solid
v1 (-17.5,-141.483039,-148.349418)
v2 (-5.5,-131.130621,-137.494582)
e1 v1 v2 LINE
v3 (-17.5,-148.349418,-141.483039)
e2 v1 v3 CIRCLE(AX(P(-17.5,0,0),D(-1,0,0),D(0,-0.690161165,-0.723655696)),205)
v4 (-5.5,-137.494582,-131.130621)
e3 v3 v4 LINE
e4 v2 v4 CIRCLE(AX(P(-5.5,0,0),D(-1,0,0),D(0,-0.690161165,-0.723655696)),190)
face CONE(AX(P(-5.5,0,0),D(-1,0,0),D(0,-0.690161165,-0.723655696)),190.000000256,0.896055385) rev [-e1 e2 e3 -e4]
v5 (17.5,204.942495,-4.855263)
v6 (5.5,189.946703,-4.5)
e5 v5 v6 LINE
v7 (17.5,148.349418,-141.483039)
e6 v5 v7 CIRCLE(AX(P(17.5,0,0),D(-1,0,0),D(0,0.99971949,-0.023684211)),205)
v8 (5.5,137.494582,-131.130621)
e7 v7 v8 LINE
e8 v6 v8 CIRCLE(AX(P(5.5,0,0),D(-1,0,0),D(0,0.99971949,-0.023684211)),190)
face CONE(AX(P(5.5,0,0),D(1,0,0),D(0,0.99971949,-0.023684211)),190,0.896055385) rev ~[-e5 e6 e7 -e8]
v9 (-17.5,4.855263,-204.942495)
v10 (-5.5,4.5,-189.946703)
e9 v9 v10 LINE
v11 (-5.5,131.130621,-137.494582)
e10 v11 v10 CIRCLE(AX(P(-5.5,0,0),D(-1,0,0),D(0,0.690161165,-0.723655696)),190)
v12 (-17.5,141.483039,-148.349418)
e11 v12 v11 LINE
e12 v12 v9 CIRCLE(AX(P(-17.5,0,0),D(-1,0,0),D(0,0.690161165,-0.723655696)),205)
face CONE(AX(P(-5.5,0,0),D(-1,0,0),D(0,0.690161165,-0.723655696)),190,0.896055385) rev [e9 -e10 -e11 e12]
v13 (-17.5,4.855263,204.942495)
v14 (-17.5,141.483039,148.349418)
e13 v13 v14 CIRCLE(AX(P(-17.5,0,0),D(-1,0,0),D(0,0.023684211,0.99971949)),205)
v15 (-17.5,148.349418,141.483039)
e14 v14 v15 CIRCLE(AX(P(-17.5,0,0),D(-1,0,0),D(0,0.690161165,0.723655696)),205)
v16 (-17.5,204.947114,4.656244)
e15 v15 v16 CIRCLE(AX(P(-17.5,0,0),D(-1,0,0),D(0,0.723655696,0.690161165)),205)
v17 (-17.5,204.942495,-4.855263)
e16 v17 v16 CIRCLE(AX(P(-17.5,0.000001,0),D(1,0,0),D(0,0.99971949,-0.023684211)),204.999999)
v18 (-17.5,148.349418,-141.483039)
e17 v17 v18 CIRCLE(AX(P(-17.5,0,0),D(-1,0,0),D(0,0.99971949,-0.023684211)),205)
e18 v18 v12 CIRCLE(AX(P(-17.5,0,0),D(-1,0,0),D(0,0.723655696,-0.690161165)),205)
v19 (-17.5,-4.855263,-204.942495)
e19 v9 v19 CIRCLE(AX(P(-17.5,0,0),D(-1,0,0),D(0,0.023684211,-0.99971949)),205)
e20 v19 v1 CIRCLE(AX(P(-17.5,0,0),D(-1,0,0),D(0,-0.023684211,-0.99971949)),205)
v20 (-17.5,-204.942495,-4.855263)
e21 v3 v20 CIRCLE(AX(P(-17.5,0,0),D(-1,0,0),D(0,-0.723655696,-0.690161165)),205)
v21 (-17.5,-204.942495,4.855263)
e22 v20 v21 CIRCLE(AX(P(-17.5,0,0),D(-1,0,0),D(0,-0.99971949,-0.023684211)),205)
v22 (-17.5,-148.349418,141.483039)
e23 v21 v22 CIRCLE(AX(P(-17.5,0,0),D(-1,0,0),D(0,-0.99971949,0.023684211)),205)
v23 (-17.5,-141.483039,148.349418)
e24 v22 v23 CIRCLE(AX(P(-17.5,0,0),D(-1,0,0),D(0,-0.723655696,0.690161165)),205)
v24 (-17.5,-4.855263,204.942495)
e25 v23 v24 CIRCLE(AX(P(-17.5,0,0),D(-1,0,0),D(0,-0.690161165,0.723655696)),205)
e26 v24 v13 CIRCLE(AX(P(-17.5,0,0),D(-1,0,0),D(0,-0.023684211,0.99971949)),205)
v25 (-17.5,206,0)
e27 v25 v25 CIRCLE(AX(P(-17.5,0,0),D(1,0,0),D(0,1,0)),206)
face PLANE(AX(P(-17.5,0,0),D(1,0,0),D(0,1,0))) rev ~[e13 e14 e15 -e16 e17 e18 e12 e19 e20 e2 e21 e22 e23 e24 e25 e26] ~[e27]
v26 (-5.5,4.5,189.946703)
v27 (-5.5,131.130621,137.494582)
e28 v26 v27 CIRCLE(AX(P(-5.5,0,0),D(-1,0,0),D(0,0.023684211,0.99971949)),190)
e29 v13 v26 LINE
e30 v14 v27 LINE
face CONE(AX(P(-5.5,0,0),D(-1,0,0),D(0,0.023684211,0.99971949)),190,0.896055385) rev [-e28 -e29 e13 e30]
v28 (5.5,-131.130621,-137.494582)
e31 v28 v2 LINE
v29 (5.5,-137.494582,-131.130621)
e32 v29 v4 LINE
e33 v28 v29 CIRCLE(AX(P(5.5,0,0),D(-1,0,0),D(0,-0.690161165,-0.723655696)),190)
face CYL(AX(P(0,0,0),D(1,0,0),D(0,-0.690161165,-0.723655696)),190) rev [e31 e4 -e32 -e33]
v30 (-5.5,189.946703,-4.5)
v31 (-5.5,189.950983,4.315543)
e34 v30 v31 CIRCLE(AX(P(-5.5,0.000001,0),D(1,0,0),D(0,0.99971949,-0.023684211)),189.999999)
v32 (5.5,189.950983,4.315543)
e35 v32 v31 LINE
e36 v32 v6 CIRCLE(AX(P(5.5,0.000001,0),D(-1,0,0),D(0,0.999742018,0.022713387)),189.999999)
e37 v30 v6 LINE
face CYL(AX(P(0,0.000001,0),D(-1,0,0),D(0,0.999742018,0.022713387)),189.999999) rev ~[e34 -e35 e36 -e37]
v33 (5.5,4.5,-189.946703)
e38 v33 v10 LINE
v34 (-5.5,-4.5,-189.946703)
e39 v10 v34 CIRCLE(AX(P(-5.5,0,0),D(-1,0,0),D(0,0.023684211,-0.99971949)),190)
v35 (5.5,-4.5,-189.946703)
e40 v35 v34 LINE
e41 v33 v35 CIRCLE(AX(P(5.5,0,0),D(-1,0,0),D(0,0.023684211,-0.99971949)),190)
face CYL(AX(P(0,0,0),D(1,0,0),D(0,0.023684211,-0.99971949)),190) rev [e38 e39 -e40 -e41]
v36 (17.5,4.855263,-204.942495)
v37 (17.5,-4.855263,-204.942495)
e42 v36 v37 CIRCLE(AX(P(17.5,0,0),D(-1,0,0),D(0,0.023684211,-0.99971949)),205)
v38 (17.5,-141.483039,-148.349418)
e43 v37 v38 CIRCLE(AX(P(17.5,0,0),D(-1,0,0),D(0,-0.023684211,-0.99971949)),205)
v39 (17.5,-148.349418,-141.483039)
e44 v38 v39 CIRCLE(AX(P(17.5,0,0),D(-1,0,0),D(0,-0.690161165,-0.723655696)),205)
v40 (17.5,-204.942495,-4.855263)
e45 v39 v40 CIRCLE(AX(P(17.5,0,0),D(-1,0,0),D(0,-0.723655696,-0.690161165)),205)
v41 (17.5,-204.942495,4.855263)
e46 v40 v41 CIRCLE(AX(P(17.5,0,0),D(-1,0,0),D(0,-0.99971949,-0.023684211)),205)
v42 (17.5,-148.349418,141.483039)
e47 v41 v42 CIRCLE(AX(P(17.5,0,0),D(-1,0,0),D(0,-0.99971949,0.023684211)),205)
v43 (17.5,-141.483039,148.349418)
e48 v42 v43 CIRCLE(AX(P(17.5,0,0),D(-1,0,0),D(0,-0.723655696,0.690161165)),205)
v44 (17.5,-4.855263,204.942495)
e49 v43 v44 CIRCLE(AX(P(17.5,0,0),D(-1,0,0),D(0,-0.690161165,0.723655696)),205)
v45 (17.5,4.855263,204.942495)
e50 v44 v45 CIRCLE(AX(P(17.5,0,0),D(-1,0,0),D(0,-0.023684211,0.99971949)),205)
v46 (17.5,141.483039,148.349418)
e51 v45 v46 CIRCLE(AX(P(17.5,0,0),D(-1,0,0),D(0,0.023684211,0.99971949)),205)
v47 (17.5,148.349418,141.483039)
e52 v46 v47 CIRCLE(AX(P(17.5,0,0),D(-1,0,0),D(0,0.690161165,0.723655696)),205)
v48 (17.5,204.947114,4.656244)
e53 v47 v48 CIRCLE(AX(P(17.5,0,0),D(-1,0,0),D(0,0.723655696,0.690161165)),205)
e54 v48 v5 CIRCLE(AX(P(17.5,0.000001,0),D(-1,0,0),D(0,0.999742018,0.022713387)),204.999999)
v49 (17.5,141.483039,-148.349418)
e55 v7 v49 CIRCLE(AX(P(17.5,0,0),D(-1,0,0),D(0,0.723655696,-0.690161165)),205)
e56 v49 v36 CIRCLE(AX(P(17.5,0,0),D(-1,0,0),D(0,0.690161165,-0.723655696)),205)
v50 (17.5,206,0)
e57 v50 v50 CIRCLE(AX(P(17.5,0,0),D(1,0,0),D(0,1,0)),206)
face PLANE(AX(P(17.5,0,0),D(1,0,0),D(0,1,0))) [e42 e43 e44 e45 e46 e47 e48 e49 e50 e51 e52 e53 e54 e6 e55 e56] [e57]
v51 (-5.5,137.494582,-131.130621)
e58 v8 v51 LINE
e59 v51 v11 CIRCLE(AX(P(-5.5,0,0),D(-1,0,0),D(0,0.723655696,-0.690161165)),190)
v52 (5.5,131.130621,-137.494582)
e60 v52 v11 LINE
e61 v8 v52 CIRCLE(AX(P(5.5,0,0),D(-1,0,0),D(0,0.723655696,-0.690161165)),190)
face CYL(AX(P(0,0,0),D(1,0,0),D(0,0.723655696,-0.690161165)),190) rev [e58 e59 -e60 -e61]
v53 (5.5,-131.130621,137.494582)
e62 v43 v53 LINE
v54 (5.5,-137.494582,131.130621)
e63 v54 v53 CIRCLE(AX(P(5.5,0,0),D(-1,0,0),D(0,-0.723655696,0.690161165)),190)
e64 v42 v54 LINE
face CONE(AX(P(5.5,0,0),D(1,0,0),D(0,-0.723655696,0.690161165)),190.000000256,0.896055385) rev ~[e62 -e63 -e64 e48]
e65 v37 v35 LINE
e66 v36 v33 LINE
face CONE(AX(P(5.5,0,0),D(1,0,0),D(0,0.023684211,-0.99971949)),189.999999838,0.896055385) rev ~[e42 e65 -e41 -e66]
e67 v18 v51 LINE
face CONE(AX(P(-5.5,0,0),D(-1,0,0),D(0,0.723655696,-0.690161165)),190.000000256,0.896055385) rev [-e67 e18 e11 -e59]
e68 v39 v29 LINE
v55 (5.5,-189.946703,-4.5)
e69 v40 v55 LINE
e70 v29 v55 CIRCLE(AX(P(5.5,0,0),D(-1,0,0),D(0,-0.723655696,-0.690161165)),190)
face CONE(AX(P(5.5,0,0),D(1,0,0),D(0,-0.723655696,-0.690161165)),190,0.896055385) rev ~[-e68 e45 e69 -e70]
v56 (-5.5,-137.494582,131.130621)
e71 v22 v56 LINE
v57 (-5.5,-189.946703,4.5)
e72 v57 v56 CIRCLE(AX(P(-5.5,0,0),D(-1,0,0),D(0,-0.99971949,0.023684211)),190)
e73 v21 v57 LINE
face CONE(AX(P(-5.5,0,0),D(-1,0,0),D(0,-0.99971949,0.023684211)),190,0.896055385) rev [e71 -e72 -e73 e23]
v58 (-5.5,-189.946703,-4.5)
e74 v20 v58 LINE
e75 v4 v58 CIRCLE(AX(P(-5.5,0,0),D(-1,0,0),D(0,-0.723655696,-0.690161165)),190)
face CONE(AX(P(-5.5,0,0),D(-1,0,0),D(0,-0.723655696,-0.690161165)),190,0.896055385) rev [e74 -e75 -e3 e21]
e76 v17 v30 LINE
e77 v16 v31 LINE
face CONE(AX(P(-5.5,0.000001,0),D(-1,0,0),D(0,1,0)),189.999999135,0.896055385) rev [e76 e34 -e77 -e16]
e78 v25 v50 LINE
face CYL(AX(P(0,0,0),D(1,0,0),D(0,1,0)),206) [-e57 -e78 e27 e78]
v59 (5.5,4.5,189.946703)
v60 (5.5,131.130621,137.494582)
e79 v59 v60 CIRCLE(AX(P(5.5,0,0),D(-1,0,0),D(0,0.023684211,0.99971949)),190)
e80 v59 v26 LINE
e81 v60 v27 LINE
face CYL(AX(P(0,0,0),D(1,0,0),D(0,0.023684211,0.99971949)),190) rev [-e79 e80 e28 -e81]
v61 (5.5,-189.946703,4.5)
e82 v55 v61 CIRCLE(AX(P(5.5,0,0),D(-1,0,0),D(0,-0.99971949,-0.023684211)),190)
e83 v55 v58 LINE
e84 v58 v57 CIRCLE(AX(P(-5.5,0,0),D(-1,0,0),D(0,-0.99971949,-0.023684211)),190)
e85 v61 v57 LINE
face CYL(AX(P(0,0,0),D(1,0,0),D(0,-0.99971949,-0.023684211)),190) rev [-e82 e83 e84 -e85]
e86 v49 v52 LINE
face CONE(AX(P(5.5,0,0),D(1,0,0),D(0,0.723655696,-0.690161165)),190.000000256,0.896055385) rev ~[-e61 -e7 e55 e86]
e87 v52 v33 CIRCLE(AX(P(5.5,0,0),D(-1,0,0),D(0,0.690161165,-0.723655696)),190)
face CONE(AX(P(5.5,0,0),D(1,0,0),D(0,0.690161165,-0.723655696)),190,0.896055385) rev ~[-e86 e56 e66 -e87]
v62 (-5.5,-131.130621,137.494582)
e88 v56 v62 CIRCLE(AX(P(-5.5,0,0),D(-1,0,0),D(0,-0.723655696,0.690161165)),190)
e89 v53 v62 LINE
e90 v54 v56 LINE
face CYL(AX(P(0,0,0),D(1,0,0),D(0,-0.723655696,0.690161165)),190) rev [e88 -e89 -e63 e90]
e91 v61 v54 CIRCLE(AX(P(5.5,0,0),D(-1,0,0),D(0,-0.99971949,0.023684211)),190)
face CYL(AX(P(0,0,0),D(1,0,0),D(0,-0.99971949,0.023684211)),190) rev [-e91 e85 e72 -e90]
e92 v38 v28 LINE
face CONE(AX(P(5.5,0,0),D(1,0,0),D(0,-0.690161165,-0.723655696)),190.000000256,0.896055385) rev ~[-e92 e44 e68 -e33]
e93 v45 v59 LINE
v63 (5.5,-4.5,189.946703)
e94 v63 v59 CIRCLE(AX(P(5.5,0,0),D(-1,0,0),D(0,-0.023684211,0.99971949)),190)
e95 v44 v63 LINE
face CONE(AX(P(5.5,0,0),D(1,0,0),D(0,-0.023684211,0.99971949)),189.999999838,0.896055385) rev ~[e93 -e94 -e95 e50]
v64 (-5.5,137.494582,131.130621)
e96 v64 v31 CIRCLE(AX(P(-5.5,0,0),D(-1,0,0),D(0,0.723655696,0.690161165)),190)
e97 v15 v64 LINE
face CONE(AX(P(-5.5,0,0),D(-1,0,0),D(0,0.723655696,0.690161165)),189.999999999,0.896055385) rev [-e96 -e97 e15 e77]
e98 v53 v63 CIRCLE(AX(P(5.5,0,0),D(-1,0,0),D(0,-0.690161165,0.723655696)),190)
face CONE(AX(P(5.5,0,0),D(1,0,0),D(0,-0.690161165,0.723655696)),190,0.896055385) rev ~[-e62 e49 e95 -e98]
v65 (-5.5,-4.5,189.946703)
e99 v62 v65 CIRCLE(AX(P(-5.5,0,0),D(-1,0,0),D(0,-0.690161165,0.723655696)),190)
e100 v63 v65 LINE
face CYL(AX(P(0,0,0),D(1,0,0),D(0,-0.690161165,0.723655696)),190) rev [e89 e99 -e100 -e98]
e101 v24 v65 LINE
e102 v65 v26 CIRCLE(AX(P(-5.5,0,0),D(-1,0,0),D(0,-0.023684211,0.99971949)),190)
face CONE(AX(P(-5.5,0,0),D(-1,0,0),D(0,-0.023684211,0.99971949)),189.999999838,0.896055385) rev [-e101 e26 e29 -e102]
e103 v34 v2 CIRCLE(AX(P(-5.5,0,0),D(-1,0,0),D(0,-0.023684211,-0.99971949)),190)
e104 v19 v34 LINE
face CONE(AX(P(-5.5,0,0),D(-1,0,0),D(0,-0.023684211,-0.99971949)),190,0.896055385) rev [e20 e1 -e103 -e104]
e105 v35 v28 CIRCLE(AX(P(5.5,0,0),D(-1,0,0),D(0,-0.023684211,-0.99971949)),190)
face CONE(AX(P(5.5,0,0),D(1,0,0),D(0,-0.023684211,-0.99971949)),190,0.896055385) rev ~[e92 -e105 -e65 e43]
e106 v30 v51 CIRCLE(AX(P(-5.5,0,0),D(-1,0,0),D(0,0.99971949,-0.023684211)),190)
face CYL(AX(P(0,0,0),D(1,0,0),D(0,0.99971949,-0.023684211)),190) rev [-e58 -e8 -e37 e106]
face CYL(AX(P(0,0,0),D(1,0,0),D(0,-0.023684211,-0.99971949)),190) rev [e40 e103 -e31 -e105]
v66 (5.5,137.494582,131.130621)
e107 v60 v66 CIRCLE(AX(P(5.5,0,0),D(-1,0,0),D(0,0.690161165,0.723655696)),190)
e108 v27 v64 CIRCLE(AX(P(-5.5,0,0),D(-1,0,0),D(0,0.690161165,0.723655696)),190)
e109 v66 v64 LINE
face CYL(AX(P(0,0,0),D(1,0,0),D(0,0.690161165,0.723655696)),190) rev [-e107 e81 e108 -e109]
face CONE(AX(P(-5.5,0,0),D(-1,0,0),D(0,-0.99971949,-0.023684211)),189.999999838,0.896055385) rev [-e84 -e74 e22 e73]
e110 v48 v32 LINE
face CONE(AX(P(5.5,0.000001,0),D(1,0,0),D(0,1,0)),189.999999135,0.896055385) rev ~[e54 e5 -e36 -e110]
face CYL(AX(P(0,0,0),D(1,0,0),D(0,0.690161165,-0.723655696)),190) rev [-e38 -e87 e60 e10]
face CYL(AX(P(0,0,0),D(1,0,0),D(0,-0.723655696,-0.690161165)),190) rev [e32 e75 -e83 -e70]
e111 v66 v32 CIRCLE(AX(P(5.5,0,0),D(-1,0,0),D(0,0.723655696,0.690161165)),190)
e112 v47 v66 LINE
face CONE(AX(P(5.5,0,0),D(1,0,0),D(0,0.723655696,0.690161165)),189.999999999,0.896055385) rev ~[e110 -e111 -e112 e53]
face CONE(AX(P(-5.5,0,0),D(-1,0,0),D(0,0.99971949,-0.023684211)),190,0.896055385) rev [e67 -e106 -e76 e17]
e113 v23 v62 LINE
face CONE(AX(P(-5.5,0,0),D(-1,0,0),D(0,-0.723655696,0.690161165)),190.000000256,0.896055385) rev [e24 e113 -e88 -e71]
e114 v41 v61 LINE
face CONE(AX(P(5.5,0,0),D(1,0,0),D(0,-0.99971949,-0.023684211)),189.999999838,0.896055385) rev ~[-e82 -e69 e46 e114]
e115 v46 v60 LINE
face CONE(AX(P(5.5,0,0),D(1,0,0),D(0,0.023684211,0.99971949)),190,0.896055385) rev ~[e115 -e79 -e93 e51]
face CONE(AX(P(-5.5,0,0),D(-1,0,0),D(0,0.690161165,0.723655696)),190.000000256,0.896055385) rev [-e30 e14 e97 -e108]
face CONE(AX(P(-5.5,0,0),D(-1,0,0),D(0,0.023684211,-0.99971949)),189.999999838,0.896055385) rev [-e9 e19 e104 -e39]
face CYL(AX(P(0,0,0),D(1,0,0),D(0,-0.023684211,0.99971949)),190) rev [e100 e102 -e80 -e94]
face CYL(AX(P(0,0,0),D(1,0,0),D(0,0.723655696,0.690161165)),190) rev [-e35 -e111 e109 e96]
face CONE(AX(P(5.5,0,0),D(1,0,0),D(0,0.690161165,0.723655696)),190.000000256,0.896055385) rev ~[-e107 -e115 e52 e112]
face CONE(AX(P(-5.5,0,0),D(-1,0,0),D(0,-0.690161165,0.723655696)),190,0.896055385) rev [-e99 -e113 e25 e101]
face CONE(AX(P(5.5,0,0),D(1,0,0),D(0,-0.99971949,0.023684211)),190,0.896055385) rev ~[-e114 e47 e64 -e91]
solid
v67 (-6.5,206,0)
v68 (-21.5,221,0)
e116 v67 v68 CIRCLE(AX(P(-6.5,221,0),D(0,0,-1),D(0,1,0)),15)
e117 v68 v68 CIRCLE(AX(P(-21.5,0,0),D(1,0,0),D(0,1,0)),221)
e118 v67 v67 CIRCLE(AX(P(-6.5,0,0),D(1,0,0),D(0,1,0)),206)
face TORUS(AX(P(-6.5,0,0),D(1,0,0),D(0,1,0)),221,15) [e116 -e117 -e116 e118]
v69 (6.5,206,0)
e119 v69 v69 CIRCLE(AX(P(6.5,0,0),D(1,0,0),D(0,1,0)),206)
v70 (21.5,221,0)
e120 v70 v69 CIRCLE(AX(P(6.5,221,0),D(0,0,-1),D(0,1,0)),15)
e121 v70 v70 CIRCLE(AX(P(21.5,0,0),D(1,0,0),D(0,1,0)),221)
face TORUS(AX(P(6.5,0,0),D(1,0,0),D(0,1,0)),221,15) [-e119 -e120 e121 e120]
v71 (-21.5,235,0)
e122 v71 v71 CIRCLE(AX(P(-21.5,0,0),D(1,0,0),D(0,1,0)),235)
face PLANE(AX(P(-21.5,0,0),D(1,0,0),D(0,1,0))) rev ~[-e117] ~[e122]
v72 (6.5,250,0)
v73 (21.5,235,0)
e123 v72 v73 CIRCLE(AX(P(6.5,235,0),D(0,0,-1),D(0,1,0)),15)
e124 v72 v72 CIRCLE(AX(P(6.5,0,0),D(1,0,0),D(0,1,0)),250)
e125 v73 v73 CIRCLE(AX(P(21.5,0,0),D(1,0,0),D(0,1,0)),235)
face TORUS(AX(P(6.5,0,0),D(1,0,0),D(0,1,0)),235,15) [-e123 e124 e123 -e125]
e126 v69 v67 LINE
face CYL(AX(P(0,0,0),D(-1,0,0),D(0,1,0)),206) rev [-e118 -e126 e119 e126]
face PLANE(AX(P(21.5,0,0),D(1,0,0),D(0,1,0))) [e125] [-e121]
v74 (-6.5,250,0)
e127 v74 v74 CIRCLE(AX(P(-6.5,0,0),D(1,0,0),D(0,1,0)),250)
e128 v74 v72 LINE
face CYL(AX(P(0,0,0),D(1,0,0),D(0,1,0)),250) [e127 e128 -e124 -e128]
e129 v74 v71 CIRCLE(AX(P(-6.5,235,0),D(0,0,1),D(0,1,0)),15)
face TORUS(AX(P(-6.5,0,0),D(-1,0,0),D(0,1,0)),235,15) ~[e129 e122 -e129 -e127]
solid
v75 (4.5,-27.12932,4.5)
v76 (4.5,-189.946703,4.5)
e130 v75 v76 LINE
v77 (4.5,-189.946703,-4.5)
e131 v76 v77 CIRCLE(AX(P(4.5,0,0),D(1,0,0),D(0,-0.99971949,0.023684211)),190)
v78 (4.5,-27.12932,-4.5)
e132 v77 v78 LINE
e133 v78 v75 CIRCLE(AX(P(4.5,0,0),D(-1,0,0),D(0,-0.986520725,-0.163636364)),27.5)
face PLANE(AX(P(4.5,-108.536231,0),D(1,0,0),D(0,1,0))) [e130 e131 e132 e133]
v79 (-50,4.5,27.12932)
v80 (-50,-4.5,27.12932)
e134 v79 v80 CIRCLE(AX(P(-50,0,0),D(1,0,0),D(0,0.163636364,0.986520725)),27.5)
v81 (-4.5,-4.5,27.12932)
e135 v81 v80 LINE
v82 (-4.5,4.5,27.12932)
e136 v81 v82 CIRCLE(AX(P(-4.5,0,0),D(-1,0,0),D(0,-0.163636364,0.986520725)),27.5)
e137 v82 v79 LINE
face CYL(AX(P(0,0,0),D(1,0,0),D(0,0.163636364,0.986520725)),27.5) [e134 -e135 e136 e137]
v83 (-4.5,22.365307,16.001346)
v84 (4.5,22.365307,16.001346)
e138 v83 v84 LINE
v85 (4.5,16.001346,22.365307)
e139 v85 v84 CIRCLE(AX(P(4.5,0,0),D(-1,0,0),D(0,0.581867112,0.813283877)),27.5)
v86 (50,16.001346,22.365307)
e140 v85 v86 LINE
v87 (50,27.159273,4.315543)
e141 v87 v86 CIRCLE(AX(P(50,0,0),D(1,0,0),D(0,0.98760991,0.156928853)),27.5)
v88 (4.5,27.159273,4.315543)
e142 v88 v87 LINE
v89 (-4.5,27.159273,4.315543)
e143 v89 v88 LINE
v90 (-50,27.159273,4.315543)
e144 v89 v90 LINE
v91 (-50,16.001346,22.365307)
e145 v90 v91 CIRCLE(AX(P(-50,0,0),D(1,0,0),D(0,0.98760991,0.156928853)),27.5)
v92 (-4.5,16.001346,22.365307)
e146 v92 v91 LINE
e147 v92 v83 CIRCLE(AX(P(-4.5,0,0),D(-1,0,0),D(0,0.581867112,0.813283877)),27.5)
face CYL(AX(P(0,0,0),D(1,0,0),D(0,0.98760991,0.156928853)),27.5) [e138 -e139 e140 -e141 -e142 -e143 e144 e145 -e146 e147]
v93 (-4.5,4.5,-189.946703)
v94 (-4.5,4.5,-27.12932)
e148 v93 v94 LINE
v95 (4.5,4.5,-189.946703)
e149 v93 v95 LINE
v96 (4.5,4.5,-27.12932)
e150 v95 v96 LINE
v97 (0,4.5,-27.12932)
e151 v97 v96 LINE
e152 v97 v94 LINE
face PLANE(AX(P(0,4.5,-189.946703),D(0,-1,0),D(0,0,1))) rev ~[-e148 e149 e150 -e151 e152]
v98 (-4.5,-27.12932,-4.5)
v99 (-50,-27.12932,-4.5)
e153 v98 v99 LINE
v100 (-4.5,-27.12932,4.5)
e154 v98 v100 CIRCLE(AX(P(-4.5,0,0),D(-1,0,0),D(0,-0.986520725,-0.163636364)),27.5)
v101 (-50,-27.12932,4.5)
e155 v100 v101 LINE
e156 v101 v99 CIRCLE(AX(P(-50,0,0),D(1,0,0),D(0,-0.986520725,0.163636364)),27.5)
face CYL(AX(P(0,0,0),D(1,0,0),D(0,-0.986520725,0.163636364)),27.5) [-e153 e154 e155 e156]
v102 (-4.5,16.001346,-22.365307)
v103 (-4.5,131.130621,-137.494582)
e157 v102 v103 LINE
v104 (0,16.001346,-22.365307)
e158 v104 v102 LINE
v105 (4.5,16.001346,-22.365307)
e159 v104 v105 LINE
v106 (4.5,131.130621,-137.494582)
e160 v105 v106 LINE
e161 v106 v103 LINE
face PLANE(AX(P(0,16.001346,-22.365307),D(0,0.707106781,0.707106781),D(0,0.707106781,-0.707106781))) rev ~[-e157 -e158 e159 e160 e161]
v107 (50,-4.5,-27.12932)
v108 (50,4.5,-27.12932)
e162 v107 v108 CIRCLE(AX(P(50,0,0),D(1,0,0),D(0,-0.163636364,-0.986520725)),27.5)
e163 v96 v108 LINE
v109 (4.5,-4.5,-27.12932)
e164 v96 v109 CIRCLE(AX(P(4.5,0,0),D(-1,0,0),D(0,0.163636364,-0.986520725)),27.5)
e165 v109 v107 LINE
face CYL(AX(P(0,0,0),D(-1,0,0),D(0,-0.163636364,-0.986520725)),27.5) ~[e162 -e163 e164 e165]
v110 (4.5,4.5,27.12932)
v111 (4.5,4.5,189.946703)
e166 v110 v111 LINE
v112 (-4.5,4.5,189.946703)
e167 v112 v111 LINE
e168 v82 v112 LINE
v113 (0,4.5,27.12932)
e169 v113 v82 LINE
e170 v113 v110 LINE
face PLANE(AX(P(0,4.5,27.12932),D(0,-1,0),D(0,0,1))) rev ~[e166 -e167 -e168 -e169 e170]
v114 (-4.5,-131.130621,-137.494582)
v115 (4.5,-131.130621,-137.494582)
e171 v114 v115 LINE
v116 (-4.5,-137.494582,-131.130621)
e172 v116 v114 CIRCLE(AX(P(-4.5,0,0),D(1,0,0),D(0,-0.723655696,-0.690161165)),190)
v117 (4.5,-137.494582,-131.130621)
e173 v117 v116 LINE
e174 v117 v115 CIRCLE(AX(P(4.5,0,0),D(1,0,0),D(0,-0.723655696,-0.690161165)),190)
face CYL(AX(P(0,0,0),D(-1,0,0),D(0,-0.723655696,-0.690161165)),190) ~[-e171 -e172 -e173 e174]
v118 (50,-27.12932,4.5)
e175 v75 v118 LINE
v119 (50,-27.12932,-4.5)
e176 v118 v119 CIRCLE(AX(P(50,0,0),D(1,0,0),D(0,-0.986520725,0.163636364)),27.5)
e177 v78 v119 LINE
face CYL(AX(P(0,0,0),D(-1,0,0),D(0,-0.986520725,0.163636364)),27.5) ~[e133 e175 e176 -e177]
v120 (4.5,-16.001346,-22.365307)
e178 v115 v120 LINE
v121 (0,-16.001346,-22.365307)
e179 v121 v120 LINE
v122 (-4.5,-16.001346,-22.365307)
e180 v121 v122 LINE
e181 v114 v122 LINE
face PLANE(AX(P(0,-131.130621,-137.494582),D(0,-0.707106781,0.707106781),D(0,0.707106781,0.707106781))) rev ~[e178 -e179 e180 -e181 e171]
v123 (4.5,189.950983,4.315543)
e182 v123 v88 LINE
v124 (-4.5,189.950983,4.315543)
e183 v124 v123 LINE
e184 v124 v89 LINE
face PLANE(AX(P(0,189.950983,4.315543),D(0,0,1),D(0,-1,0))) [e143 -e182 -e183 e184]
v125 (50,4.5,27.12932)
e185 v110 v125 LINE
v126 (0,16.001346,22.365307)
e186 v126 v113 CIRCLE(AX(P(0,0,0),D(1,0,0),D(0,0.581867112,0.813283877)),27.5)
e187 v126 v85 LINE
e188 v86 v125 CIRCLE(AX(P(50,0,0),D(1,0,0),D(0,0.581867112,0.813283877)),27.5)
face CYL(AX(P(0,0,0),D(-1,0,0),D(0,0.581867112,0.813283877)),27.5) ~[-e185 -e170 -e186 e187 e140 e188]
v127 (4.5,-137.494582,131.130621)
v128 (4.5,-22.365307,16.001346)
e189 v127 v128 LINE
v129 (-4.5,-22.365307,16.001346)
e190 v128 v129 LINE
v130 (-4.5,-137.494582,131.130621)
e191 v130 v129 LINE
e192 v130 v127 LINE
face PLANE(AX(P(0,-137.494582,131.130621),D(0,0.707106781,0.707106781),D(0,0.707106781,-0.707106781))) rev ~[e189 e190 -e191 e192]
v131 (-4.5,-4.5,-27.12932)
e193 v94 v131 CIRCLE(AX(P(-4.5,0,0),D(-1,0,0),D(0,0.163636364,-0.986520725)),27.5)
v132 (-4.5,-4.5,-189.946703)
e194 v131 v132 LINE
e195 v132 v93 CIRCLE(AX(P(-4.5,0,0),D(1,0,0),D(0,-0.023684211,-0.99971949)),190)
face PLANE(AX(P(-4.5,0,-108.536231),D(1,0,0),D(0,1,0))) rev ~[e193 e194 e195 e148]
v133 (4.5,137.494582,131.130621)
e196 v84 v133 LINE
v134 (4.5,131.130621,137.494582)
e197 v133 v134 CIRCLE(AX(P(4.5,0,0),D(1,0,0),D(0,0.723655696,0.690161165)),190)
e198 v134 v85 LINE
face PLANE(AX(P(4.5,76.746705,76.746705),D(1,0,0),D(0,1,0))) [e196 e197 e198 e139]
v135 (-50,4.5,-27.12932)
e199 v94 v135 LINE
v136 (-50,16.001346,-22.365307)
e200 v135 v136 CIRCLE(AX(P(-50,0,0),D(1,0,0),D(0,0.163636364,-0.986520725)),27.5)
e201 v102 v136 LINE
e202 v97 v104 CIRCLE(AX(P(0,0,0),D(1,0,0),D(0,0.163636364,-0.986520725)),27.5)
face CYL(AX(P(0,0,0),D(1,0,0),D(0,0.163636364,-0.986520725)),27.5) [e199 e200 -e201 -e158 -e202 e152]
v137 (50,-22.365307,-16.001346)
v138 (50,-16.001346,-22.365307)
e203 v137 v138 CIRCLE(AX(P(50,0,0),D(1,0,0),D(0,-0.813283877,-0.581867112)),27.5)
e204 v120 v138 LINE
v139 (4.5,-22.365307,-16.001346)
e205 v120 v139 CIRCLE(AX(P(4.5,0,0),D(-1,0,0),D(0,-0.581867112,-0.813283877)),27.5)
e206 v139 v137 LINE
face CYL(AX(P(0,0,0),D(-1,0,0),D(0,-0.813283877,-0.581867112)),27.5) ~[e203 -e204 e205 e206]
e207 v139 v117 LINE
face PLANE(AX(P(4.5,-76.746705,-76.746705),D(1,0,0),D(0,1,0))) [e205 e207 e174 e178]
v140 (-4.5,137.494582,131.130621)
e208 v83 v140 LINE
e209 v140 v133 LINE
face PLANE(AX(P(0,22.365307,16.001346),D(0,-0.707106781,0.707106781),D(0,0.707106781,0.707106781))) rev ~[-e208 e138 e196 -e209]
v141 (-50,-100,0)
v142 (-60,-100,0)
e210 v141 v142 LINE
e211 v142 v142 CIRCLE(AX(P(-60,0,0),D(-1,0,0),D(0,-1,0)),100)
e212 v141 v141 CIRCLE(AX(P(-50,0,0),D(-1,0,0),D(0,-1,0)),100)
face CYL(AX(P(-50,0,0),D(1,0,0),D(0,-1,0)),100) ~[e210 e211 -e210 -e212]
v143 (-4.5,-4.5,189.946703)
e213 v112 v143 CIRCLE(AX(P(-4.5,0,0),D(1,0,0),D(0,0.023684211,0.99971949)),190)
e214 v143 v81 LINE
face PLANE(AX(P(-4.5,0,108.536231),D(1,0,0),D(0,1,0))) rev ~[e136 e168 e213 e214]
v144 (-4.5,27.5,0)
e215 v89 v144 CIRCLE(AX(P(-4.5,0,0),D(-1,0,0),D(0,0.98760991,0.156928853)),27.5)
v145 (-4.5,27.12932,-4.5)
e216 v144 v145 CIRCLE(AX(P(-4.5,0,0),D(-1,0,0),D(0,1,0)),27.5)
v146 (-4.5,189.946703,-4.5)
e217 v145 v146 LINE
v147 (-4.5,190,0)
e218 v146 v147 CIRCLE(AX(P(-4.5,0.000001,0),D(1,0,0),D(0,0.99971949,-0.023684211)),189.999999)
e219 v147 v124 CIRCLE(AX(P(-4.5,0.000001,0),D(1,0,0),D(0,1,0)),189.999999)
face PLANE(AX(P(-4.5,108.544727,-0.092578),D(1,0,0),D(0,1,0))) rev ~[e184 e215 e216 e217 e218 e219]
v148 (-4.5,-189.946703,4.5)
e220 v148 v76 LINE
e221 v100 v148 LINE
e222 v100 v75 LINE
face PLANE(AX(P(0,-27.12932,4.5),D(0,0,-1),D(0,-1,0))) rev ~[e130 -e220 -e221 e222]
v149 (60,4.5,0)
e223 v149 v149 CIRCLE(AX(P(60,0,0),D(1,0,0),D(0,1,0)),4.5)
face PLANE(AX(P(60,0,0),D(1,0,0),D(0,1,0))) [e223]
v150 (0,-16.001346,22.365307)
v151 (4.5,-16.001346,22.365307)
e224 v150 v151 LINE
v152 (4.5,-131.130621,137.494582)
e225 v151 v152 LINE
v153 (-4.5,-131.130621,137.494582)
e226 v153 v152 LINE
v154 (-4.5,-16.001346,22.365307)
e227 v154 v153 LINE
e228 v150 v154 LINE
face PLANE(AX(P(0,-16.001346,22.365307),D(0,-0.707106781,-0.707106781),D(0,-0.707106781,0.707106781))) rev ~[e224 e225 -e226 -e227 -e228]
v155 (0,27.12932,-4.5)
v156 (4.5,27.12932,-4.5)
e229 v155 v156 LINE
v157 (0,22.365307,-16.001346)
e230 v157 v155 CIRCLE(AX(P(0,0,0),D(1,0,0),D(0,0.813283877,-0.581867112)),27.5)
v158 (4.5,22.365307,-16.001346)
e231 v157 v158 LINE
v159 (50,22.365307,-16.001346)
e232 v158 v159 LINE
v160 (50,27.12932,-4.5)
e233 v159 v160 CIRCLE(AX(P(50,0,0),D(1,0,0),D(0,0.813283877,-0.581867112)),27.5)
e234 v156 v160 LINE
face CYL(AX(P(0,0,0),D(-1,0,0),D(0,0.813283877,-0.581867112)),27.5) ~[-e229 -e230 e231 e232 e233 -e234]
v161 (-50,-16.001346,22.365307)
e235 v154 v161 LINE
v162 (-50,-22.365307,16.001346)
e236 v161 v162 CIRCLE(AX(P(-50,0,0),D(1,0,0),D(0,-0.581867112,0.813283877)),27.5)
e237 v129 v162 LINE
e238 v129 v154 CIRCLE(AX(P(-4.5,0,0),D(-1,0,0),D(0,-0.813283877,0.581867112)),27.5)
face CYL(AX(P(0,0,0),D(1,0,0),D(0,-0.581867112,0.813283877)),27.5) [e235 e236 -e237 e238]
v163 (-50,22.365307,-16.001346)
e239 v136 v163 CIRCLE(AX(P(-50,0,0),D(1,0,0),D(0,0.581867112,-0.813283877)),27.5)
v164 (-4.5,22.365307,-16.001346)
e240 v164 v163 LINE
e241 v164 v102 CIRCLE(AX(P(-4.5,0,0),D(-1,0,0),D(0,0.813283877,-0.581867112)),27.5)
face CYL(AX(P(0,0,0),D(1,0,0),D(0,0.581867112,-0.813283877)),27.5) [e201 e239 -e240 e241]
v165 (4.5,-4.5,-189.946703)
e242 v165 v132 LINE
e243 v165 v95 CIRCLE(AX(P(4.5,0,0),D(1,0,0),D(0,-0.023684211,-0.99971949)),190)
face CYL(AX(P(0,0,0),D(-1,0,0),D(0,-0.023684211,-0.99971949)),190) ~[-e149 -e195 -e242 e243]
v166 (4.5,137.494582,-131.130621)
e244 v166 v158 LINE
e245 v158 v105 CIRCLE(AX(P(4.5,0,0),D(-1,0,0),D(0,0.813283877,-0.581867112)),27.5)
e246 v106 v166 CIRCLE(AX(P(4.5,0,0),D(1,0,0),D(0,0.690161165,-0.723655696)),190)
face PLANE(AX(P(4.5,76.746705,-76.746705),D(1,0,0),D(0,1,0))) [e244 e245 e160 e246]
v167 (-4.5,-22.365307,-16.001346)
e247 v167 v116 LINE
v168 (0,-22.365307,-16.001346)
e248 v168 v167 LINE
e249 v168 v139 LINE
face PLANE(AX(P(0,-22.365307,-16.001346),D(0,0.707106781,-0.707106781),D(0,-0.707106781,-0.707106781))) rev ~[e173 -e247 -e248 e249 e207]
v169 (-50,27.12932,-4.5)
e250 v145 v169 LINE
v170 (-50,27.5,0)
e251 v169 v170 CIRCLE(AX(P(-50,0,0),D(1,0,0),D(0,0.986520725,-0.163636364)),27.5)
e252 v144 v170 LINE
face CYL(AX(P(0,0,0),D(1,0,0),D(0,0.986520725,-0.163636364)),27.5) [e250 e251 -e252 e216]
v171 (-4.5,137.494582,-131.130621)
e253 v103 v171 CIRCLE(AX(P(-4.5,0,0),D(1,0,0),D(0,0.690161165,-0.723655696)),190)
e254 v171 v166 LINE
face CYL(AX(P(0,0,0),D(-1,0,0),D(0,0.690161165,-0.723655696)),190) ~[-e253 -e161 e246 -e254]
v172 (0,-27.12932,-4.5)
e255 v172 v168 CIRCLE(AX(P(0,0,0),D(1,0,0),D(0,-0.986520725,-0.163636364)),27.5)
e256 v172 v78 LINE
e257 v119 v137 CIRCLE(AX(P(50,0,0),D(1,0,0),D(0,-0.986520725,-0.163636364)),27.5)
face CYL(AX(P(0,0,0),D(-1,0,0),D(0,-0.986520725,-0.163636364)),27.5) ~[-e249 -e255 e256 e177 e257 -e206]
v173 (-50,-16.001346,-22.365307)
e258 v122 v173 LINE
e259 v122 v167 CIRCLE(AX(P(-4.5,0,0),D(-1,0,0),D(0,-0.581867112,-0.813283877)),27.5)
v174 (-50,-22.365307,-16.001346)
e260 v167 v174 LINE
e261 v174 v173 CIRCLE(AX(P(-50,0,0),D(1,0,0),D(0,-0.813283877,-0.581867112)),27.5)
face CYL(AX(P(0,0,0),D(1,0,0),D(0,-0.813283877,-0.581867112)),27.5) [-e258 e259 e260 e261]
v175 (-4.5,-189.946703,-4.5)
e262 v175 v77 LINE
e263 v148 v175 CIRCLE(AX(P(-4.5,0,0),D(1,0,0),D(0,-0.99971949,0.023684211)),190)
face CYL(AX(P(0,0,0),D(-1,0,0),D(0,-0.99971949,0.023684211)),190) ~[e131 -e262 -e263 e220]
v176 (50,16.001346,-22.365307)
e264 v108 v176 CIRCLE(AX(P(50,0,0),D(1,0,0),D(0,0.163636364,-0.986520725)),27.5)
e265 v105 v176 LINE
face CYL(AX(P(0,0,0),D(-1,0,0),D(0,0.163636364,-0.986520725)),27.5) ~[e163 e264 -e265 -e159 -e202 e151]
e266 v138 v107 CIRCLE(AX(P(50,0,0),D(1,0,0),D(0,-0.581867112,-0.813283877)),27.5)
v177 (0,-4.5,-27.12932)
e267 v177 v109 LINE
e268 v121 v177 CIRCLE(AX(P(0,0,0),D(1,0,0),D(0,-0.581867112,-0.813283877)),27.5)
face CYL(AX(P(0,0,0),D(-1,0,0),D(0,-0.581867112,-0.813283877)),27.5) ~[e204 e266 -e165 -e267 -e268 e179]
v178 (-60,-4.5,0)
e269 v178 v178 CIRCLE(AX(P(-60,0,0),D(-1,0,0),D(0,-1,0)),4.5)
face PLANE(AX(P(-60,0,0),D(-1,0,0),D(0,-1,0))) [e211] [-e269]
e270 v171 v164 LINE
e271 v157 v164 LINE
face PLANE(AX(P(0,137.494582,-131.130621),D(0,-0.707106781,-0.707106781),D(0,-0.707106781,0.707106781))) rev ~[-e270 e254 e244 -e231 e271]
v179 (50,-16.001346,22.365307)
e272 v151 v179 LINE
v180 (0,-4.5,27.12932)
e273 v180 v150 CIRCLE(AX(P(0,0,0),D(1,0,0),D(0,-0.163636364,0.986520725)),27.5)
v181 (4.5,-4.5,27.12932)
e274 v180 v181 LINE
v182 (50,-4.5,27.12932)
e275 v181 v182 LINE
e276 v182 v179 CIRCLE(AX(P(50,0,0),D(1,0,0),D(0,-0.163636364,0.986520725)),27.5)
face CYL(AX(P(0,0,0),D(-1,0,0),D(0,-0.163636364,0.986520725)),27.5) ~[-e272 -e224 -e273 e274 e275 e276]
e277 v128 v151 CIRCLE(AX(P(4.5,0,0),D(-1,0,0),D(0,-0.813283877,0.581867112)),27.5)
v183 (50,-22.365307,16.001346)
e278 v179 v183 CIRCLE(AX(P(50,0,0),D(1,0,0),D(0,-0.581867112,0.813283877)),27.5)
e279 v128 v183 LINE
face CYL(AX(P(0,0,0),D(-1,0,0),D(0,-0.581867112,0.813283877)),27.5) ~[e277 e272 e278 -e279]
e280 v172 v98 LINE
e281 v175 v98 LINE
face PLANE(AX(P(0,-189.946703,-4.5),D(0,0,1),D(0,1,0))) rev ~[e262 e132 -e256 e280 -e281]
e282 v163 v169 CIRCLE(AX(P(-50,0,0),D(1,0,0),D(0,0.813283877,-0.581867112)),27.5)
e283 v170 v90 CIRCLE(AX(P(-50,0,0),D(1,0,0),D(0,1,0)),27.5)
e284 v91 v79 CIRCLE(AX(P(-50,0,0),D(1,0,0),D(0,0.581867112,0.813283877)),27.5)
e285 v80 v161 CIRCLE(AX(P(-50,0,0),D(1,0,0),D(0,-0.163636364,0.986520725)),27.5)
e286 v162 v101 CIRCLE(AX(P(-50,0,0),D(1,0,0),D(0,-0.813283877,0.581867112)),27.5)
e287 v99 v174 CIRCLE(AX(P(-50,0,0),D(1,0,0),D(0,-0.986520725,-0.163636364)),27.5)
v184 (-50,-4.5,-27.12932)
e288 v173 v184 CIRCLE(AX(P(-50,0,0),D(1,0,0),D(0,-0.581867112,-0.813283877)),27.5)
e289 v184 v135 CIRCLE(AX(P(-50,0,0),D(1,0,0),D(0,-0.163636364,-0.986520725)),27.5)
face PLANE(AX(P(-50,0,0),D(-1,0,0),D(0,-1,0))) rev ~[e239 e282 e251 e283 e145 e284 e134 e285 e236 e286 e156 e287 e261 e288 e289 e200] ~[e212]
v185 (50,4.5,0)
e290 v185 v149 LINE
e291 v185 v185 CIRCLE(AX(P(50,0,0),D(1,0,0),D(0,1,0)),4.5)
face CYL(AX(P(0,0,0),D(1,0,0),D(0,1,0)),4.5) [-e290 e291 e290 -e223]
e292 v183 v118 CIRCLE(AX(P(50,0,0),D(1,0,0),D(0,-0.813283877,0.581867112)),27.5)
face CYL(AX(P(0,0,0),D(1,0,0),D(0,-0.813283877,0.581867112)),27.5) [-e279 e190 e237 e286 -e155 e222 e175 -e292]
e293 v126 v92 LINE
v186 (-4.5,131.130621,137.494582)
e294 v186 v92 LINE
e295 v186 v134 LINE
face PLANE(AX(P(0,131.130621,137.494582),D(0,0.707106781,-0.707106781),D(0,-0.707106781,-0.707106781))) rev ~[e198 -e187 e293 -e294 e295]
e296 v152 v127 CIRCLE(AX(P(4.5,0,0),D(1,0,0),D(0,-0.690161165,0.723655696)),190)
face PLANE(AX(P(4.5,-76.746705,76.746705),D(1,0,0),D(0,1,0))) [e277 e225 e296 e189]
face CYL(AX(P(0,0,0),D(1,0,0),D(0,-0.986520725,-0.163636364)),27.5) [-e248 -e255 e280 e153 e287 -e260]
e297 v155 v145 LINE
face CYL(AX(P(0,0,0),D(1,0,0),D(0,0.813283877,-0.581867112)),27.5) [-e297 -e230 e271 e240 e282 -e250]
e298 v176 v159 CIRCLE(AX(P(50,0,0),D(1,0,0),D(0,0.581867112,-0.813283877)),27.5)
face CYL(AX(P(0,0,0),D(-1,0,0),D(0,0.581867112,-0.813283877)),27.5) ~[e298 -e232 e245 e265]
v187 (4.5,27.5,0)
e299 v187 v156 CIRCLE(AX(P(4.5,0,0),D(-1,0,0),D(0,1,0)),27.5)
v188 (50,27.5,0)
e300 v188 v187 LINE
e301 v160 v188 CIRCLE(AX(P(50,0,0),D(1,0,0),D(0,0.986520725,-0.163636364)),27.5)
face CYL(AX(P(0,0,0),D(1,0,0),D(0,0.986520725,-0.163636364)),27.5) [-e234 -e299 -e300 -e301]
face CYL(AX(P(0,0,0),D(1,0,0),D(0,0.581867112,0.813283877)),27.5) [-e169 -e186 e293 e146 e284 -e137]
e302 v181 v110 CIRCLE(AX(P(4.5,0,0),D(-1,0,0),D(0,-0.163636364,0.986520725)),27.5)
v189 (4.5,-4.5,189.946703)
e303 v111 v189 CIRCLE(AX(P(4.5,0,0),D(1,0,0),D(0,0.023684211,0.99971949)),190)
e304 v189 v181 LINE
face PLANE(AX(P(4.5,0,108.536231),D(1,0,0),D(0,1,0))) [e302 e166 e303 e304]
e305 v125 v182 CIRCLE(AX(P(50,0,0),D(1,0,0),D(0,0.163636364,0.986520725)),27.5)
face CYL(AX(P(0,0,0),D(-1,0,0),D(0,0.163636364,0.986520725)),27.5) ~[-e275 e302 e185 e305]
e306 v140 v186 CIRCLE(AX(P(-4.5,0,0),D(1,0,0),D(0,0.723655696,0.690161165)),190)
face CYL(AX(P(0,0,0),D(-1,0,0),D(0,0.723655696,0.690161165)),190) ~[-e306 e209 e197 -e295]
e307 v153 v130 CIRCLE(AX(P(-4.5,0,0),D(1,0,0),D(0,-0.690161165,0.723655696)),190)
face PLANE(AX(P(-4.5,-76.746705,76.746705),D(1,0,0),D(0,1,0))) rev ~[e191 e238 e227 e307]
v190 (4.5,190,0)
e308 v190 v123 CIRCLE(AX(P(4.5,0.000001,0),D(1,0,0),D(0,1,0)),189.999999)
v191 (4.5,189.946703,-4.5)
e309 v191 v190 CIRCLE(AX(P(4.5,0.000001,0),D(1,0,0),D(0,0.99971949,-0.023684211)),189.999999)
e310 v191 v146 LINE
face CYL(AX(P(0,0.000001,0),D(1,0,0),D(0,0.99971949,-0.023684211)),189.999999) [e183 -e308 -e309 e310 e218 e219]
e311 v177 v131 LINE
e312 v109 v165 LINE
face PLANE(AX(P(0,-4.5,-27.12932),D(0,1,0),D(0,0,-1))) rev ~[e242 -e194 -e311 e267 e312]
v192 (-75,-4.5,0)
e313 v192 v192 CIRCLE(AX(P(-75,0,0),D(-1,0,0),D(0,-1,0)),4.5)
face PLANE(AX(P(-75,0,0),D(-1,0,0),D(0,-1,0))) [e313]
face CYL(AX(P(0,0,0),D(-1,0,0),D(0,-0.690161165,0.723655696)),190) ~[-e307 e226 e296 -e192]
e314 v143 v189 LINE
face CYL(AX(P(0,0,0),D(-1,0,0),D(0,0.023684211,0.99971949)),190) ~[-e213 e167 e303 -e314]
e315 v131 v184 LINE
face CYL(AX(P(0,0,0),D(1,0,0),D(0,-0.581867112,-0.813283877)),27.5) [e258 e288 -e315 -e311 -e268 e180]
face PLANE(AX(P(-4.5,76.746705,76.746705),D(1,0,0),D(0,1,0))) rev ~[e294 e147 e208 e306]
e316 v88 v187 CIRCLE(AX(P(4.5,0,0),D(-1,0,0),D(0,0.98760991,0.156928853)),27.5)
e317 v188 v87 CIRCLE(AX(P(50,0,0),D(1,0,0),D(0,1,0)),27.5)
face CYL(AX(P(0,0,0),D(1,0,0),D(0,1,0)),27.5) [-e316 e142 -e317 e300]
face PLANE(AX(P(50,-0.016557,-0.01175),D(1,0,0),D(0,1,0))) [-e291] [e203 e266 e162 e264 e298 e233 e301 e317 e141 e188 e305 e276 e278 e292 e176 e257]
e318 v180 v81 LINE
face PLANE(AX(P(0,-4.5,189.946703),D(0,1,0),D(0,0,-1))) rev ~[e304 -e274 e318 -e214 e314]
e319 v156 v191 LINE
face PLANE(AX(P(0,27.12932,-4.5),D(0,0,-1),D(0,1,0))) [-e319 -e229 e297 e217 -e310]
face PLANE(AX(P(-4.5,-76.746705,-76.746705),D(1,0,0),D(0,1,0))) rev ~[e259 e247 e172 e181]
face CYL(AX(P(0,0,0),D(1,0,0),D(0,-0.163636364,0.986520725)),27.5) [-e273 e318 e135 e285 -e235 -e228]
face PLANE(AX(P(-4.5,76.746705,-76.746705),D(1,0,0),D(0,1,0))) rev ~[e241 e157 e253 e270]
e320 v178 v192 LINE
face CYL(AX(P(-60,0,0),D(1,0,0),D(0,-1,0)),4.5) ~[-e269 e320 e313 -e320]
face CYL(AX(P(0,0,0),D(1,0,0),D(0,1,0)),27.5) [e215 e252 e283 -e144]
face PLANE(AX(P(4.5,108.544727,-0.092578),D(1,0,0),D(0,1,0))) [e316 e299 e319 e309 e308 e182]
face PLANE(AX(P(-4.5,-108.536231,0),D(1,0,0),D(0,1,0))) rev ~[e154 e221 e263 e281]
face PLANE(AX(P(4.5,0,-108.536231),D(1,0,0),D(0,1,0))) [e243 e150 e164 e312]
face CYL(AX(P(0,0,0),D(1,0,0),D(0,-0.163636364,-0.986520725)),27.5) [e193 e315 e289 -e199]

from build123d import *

# Parameters (mm, degrees)
F0_R       = 4.5
F1_DEPTH   = 60
F2_DEPTH   = 50
F3_DEPTH   = 4.5
F0_R_2     = 250
F0_R_3     = 206
F4_DEPTH   = 21.5
F5_DEPTH   = 17.5
F6_R       = 15
F7_SIZE2   = 12
F7_SIZE    = 15
F7_2_SIZE2 = 12
F7_2_SIZE  = 15
F8_R       = 100
F9_DEPTH   = 10
F10_R      = 4.5
F11_DEPTH  = 15


# Not quite as in the source:
# - a feature names something its author has since deleted; it is built from what else it names


with BuildPart() as f1:
    # F0 (on Right) → F1 (new body, symmetric)
    with BuildSketch(Plane.YZ):
        Circle(F0_R)
    extrude(amount=F1_DEPTH, both=True)

    # F0 (on Right) → F2 (join, symmetric)
    with BuildSketch(Plane.YZ):
        with BuildLine():
            ThreePointArc((27.5, 0), (27.4146857974, 2.1644866893), (27.1592725361, 4.3155434546))
            ThreePointArc((27.1592725361, 4.3155434546), (25.4422970206, 10.4374097514), (22.3653066086, 16.0013455779))
            ThreePointArc((22.3653066086, 16.0013455779), (19.4454364826, 19.4454364826), (16.0013455779, 22.3653066086))
            ThreePointArc((16.0013455779, 22.3653066086), (10.52379439, 25.4066871441), (4.5, 27.1293199325))
            ThreePointArc((4.5, 27.1293199325), (0, 27.5), (-4.5, 27.1293199325))
            ThreePointArc((-4.5, 27.1293199325), (-10.52379439, 25.4066871441), (-16.0013455779, 22.3653066086))
            ThreePointArc((-16.0013455779, 22.3653066086), (-19.4454364826, 19.4454364826), (-22.3653066086, 16.0013455779))
            ThreePointArc((-22.3653066086, 16.0013455779), (-25.4066871441, 10.52379439), (-27.1293199325, 4.5))
            ThreePointArc((-27.1293199325, 4.5), (-27.5, 0), (-27.1293199325, -4.5))
            ThreePointArc((-27.1293199325, -4.5), (-25.4066871441, -10.52379439), (-22.3653066086, -16.0013455779))
            ThreePointArc((-22.3653066086, -16.0013455779), (-19.4454364826, -19.4454364826), (-16.0013455779, -22.3653066086))
            ThreePointArc((-16.0013455779, -22.3653066086), (-10.52379439, -25.4066871441), (-4.5, -27.1293199325))
            ThreePointArc((-4.5, -27.1293199325), (0, -27.5), (4.5, -27.1293199325))
            ThreePointArc((4.5, -27.1293199325), (10.52379439, -25.4066871441), (16.0013455779, -22.3653066086))
            ThreePointArc((16.0013455779, -22.3653066086), (19.4454364826, -19.4454364826), (22.3653066086, -16.0013455779))
            ThreePointArc((22.3653066086, -16.0013455779), (25.4066871441, -10.52379439), (27.1293199325, -4.5))
            ThreePointArc((27.1293199325, -4.5), (27.4071733142, -2.2576206342), (27.5, 0))
        make_face()
        Circle(F0_R, mode=Mode.SUBTRACT)
    extrude(amount=F2_DEPTH, both=True)

    # F0 (on Right) → F3 (join, symmetric)
    with BuildSketch(Plane.YZ):
        with BuildLine():
            Line((4.5, 27.1293199325), (4.5, 189.9467030511))
            ThreePointArc((4.5, 189.9467030511), (0, 190), (-4.5, 189.9467030511))
            Line((-4.5, 189.9467030511), (-4.5, 27.1293199325))
            ThreePointArc((-4.5, 27.1293199325), (0, 27.5), (4.5, 27.1293199325))
        make_face()
        with BuildLine():
            Line((-16.0013455779, 22.3653066086), (-131.1306212762, 137.4945823068))
            ThreePointArc((-131.1306212762, 137.4945823068), (-134.3502884254, 134.3502884254), (-137.4945823068, 131.1306212762))
            Line((-137.4945823068, 131.1306212762), (-22.3653066086, 16.0013455779))
            ThreePointArc((-22.3653066086, 16.0013455779), (-19.4454364826, 19.4454364826), (-16.0013455779, 22.3653066086))
        make_face()
        with BuildLine():
            Line((-27.1293199325, 4.5), (-189.9467030511, 4.5))
            ThreePointArc((-189.9467030511, 4.5), (-190, 0), (-189.9467030511, -4.5))
            Line((-189.9467030511, -4.5), (-27.1293199325, -4.5))
            ThreePointArc((-27.1293199325, -4.5), (-27.5, 0), (-27.1293199325, 4.5))
        make_face()
        with BuildLine():
            ThreePointArc((-137.4945823068, -131.1306212762), (-134.3502884254, -134.3502884254), (-131.1306212762, -137.4945823068))
            Line((-131.1306212762, -137.4945823068), (-16.0013455779, -22.3653066086))
            ThreePointArc((-16.0013455779, -22.3653066086), (-19.4454364826, -19.4454364826), (-22.3653066086, -16.0013455779))
            Line((-22.3653066086, -16.0013455779), (-137.4945823068, -131.1306212762))
        make_face()
        with BuildLine():
            Line((22.3653066086, 16.0013455779), (137.4945823068, 131.1306212762))
            ThreePointArc((137.4945823068, 131.1306212762), (134.3502884254, 134.3502884254), (131.1306212762, 137.4945823068))
            Line((131.1306212762, 137.4945823068), (16.0013455779, 22.3653066086))
            ThreePointArc((16.0013455779, 22.3653066086), (19.4454364826, 19.4454364826), (22.3653066086, 16.0013455779))
        make_face()
        with BuildLine():
            ThreePointArc((131.1306212762, -137.4945823068), (134.3502884254, -134.3502884254), (137.4945823068, -131.1306212762))
            Line((137.4945823068, -131.1306212762), (22.3653066086, -16.0013455779))
            ThreePointArc((22.3653066086, -16.0013455779), (19.4454364826, -19.4454364826), (16.0013455779, -22.3653066086))
            Line((16.0013455779, -22.3653066086), (131.1306212762, -137.4945823068))
        make_face()
        with BuildLine():
            ThreePointArc((-4.5, -189.9467030511), (0, -190), (4.5, -189.9467030511))
            Line((4.5, -189.9467030511), (4.5, -27.1293199325))
            ThreePointArc((4.5, -27.1293199325), (0, -27.5), (-4.5, -27.1293199325))
            Line((-4.5, -27.1293199325), (-4.5, -189.9467030511))
        make_face()
        with BuildLine():
            ThreePointArc((189.9467030511, -4.5), (189.9866752956, -2.2501578036), (190, 0))
            ThreePointArc((190, 0), (189.9877454483, 2.1579109074), (189.9509833738, 4.3155434546))
            Line((189.9509833738, 4.3155434546), (27.1592725361, 4.3155434546))
            ThreePointArc((27.1592725361, 4.3155434546), (27.4146857974, 2.1644866893), (27.5, 0))
            ThreePointArc((27.5, 0), (27.4071733142, -2.2576206342), (27.1293199325, -4.5))
            Line((27.1293199325, -4.5), (189.9467030511, -4.5))
        make_face()
    extrude(amount=F3_DEPTH, both=True)

    # F8 (on face) → F9 (join)
    with BuildSketch(Plane(origin=(-50, 0, 0), x_dir=(0, -1, 0), z_dir=(-1, 0, 0))):
        Circle(F8_R)
    extrude(amount=F9_DEPTH)

    # F10 (on face) → F11 (join)
    with BuildSketch(Plane(origin=(-60, 0, 0), x_dir=(0, -1, 0), z_dir=(-1, 0, 0))):
        Circle(F10_R)
    extrude(amount=F11_DEPTH)


with BuildPart() as f4:
    # F0 (on Right) → F4 (new body, symmetric)
    with BuildSketch(Plane.YZ):
        Circle(F0_R_2)
        Circle(F0_R_3, mode=Mode.SUBTRACT)
    extrude(amount=F4_DEPTH, both=True)

    # F6
    f6_edges = [f4.edges().sort_by_distance(p)[0] for p in [
        (-21.5, -250, 0),
        (0, 250, 0),
        (21.5, -250, 0),
        (-21.5, -206, 0),
        (21.5, -206, 0),
    ]]
    fillet(f6_edges, radius=F6_R)


with BuildPart() as f5:
    # F0 (on Right) → F5 (new body, symmetric)
    with BuildSketch(Plane.YZ):
        Circle(F0_R_3)
        with BuildLine():
            ThreePointArc((189.9509833738, 4.3155434546), (189.9877454483, 2.1579109074), (190, 0))
            ThreePointArc((190, 0), (189.9866752956, -2.2501578036), (189.9467030511, -4.5))
            ThreePointArc((189.9467030511, -4.5), (175.5371111771, -72.7098521494), (137.4945823068, -131.1306212762))
            ThreePointArc((137.4945823068, -131.1306212762), (134.3502884254, -134.3502884254), (131.1306212762, -137.4945823068))
            ThreePointArc((131.1306212762, -137.4945823068), (72.7098521494, -175.5371111771), (4.5, -189.9467030511))
            ThreePointArc((4.5, -189.9467030511), (0, -190), (-4.5, -189.9467030511))
            ThreePointArc((-4.5, -189.9467030511), (-72.7098521494, -175.5371111771), (-131.1306212762, -137.4945823068))
            ThreePointArc((-131.1306212762, -137.4945823068), (-134.3502884254, -134.3502884254), (-137.4945823068, -131.1306212762))
            ThreePointArc((-137.4945823068, -131.1306212762), (-175.5371111771, -72.7098521494), (-189.9467030511, -4.5))
            ThreePointArc((-189.9467030511, -4.5), (-190, 0), (-189.9467030511, 4.5))
            ThreePointArc((-189.9467030511, 4.5), (-175.5371111771, 72.7098521494), (-137.4945823068, 131.1306212762))
            ThreePointArc((-137.4945823068, 131.1306212762), (-134.3502884254, 134.3502884254), (-131.1306212762, 137.4945823068))
            ThreePointArc((-131.1306212762, 137.4945823068), (-72.7098521494, 175.5371111771), (-4.5, 189.9467030511))
            ThreePointArc((-4.5, 189.9467030511), (0, 190), (4.5, 189.9467030511))
            ThreePointArc((4.5, 189.9467030511), (72.7098521494, 175.5371111771), (131.1306212762, 137.4945823068))
            ThreePointArc((131.1306212762, 137.4945823068), (134.3502884254, 134.3502884254), (137.4945823068, 131.1306212762))
            ThreePointArc((137.4945823068, 131.1306212762), (175.5723942188, 72.6246128271), (189.9509833738, 4.3155434546))
        make_face(mode=Mode.SUBTRACT)
    extrude(amount=F5_DEPTH, both=True)

    # F7
    f7_edges = [f5.edges().sort_by_distance(p)[0] for p in [
        (17.5, -190, 0),
    ]]
    f7_side = f5.faces().sort_by_distance((17.5, -200.17344, 0))[0]
    chamfer(f7_edges, length=F7_SIZE, length2=F7_SIZE2, reference=f7_side)

    # F7#2
    f7_2_edges = [f5.edges().sort_by_distance(p)[0] for p in [
        (-17.5, -190, 0),
    ]]
    f7_2_side = f5.faces().sort_by_distance((-17.5, -200.17344, 0))[0]
    chamfer(f7_2_edges, length=F7_2_SIZE, length2=F7_2_SIZE2, reference=f7_2_side)


solid = Compound([f1.part, f4.part, f5.part])
